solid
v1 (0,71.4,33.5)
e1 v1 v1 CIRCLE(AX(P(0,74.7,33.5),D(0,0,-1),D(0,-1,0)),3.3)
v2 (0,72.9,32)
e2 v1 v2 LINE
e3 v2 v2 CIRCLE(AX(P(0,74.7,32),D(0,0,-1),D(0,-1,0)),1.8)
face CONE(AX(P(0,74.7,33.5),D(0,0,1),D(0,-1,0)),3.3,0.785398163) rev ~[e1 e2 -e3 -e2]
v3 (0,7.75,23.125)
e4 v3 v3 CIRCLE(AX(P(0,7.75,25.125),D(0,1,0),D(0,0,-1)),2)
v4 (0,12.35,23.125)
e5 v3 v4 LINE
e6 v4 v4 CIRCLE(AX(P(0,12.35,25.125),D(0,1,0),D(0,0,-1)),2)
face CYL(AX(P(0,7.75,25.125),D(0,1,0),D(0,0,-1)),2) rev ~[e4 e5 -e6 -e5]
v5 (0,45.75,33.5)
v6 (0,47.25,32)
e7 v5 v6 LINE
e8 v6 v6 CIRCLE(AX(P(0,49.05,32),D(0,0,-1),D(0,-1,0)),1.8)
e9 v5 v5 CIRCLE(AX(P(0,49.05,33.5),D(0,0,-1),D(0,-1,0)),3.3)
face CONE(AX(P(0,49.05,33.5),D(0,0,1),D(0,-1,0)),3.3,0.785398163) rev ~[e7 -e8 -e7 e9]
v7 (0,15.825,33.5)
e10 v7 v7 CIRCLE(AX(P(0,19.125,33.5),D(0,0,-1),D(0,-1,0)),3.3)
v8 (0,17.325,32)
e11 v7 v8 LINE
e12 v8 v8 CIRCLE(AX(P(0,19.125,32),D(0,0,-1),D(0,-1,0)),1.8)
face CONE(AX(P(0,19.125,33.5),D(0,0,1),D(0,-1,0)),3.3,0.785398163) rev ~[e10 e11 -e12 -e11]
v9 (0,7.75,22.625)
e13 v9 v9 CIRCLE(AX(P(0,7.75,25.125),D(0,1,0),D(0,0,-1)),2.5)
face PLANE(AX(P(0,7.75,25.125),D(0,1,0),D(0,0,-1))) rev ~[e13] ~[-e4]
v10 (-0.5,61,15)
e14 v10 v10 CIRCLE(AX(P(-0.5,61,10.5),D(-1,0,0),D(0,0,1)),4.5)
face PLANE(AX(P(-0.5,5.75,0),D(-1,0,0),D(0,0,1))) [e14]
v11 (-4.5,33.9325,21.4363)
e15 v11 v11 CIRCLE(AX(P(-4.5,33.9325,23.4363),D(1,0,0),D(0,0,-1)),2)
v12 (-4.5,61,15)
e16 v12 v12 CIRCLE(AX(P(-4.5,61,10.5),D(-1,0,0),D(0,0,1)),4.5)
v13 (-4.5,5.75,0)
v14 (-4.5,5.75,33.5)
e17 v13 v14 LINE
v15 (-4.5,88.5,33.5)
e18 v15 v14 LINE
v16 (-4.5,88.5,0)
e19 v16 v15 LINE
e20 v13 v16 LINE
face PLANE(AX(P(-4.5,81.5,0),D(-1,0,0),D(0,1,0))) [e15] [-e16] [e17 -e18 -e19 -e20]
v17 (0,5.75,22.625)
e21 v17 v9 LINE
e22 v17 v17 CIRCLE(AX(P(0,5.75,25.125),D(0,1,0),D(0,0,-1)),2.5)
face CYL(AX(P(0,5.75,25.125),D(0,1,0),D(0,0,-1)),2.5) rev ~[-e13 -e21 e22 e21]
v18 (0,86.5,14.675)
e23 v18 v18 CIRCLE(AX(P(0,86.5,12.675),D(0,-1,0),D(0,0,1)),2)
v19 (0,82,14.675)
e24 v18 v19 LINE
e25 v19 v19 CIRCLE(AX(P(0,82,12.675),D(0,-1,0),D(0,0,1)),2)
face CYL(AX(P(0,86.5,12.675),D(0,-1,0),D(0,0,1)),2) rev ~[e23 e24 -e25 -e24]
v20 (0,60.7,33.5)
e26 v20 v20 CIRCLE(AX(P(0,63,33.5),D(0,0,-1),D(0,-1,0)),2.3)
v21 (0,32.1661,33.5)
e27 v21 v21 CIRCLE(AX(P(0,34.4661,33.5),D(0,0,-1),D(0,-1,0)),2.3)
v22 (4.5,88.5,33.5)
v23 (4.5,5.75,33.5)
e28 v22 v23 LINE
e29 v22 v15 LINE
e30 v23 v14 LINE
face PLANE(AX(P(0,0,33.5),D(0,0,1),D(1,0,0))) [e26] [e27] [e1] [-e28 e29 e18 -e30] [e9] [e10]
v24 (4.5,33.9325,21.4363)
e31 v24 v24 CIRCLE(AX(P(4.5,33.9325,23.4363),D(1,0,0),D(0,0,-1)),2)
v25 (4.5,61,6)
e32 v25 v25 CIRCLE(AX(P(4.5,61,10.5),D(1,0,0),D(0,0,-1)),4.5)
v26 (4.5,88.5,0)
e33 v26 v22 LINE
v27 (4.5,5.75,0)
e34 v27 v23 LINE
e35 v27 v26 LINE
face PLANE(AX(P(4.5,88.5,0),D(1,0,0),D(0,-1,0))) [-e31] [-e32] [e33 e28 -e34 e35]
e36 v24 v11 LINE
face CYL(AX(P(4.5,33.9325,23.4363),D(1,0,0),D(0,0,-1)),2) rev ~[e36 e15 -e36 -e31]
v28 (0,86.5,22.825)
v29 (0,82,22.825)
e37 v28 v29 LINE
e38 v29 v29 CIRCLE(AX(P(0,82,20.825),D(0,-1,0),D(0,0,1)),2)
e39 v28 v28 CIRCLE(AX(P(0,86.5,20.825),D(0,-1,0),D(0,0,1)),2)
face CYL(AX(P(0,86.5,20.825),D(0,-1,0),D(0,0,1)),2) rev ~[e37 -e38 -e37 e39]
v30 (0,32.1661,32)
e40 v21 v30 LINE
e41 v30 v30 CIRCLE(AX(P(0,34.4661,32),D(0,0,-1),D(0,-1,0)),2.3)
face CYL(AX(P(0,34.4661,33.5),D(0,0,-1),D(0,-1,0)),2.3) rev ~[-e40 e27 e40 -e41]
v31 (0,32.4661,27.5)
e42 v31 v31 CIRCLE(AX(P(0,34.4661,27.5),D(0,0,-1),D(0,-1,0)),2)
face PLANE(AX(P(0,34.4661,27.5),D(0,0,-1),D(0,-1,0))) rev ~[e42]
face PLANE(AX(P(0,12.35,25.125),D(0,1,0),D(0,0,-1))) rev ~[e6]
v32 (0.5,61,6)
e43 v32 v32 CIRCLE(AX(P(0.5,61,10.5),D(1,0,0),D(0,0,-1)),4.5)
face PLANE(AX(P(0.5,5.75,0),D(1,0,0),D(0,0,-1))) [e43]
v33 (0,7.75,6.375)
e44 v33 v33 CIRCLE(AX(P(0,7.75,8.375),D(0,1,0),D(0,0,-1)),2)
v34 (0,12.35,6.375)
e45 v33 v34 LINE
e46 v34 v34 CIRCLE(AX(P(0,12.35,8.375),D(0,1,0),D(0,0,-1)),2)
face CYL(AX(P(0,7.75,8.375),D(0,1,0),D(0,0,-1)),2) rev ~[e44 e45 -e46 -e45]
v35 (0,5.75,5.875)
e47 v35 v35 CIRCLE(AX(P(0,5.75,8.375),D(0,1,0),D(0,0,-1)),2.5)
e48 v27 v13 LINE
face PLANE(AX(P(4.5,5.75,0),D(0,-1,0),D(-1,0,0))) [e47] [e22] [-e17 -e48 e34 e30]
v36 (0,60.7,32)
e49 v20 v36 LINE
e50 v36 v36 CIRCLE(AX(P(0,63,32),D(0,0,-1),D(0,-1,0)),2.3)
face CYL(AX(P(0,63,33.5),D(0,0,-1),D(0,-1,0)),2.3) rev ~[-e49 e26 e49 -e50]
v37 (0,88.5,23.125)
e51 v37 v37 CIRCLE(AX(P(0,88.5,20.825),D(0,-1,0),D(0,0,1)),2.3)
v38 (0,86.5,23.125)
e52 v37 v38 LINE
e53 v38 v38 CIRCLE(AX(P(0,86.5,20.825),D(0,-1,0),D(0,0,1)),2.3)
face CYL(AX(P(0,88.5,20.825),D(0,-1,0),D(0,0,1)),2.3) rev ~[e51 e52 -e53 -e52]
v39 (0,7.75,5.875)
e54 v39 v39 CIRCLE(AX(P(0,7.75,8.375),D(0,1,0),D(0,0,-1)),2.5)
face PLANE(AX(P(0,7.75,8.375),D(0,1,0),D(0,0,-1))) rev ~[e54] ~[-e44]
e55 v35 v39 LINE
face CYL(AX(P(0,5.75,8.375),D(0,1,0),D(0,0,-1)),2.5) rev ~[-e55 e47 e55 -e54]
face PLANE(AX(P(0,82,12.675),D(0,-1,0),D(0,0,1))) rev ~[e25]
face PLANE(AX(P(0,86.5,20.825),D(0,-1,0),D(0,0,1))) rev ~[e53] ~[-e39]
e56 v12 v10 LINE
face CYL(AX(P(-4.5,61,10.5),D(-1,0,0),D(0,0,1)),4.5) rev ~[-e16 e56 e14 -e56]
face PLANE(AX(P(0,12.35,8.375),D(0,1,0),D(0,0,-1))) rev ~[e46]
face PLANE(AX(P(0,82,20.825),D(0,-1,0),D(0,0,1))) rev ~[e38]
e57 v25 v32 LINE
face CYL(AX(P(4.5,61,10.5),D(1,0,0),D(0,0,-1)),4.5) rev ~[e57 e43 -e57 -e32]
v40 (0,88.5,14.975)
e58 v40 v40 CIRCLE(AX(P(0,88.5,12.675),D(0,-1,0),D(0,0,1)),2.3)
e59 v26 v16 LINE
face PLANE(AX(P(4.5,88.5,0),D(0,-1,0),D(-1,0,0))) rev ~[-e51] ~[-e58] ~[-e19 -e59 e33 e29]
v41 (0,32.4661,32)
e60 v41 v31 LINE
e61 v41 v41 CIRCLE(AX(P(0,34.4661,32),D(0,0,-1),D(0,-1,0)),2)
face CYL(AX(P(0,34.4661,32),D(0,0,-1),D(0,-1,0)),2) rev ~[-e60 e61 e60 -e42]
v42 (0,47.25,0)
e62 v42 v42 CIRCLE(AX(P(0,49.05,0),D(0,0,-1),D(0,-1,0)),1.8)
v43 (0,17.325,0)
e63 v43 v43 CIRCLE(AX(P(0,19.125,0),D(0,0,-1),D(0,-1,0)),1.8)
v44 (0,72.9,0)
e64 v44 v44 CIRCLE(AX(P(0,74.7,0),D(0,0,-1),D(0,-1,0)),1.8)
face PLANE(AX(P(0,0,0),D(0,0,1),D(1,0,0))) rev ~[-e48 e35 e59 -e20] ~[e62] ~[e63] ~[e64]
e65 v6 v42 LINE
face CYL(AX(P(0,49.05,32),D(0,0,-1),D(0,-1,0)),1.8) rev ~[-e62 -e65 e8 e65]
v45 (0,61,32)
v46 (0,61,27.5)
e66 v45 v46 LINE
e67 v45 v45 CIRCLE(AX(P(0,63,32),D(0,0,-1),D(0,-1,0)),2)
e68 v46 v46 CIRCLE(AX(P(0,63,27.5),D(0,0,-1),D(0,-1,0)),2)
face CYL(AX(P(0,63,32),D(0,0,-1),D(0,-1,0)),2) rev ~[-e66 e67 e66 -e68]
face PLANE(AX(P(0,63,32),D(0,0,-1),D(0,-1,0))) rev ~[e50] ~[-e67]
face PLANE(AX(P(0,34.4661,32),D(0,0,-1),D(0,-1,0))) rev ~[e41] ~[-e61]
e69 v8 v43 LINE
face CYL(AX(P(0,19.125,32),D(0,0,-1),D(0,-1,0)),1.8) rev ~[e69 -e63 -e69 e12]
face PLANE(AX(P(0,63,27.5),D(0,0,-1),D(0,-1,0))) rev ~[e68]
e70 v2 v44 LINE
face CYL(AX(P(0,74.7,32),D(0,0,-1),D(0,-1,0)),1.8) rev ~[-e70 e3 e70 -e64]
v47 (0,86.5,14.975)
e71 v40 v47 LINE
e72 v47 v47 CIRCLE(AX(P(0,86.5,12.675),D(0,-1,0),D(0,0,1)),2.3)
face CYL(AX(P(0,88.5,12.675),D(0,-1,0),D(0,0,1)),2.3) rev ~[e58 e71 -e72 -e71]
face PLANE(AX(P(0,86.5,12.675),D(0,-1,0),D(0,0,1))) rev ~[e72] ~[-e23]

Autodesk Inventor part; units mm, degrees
ref_plane "YZ Plane" through (0, 0, 0) normal (1, 0, 0) x (0, 1, 0)
ref_plane "XZ Plane" through (0, 0, 0) normal (0, 1, 0) x (-1, 0, 0)
ref_plane "Work Plane1" through (0, 0, 0) normal (0, 0, 1) x (1, 0, 0)
ref_plane "Work Plane2" through (-89, -40.3889, 33.5) normal (0, 0, 1) x (1, 0, 0)
sketch "Sketch1" plane through (0, 0, 0) normal (0, 0, 1) x (1, 0, 0)
  line L0 (23.5, 88.5) -> (-23.5, 88.5) projected
  line L1 (-23.5, 88.5) -> (-23.5, 36.5) projected
  line L2 (-26.5, 33.5) -> (-89, 33.5) projected
  line L3 (-89, 33.5) -> (-89, -72.5) projected
  line L4 (-89, -72.5) -> (-77, -72.5) projected
  line L5 (-74, -75.5) -> (-74, -93.5) projected
  line L6 (-74, -93.5) -> (74, -93.5) projected
  line L7 (74, -93.5) -> (74, -75.5) projected
  line L8 (77, -72.5) -> (89, -72.5) projected
  line L9 (89, -72.5) -> (89, 33.5) projected
  line L10 (89, 33.5) -> (26.5, 33.5) projected
  line L11 (23.5, 36.5) -> (23.5, 88.5) projected
  line L12 (-4.5, 81.5) -> (-4.5, 36.5) projected
  line L13 (-7.5, 33.5) -> (-13.5, 33.5) projected
  line L14 (-16.5, 36.5) -> (-16.5, 81.5) projected
  line L15 (7.5, 84.5) -> (13.5, 84.5) projected
  line L16 (16.5, 81.5) -> (16.5, 36.5) projected
  line L17 (13.5, 33.5) -> (7.5, 33.5) projected
  line L18 (4.5, 36.5) -> (4.5, 81.5) projected
  line L19 (-13.5, 84.5) -> (-7.5, 84.5) projected
  line L20 (-4.5, 88.5) -> (4.5, 88.5)
  line L21 (4.5, 88.5) -> (4.5, 5.75)
  line L22 (4.5, 5.75) -> (-4.5, 5.75)
  line L23 (-4.5, 5.75) -> (-4.5, 88.5)
  line L24 (-32.2, 4.75) -> (-59.9, 4.75)
  arc A0 (13.5, 33.5) -> (16.5, 36.5) centre (13.5, 36.5) ccw projected
  arc A1 (4.5, 36.5) -> (7.5, 33.5) centre (7.5, 36.5) ccw projected
  arc A2 (7.5, 84.5) -> (4.5, 81.5) centre (7.5, 81.5) ccw projected
  arc A3 (16.5, 81.5) -> (13.5, 84.5) centre (13.5, 81.5) ccw projected
  arc A4 (-4.5, 81.5) -> (-7.5, 84.5) centre (-7.5, 81.5) ccw projected
  arc A5 (-7.5, 33.5) -> (-4.5, 36.5) centre (-7.5, 36.5) ccw projected
  arc A6 (-16.5, 36.5) -> (-13.5, 33.5) centre (-13.5, 36.5) ccw projected
  arc A7 (-13.5, 84.5) -> (-16.5, 81.5) centre (-13.5, 81.5) ccw projected
  arc A8 (-26.5, 33.5) -> (-23.5, 36.5) centre (-26.5, 36.5) ccw projected
  arc A9 (-74, -75.5) -> (-77, -72.5) centre (-77, -75.5) ccw projected
  arc A10 (77, -72.5) -> (74, -75.5) centre (77, -75.5) ccw projected
  arc A11 (23.5, 36.5) -> (26.5, 33.5) centre (26.5, 36.5) ccw projected
  circle A12 centre (21.5, -85.5) radius 1.8 projected
  circle A13 centre (-64.5, -85.5) radius 1.8 projected
  circle A14 centre (83.4, -16.3889) radius 1.8 projected
  circle A15 centre (-83.4, -19.2889) radius 1.8 projected
  circle A16 centre (-21.5, -85.5) radius 1.8 projected
  circle A17 centre (64.5, -85.5) radius 1.8 projected
  circle A18 centre (-56.0375, 15.0937) radius 1.0065 projected
  circle A19 centre (39.125, 4.3375) radius 1.0065 projected
  circle A20 centre (-72.95, 4.275) radius 1.0065 projected
  circle A21 centre (39.125, 25.9125) radius 1.0065 projected
  circle A22 centre (72.95, 12.275) radius 1.0065 projected
  circle A23 centre (86, 30.5) radius 1.0065 projected
  circle A24 centre (-86, 30.5) radius 1.0065 projected
  circle A25 centre (-39.125, 12.3375) radius 1.0065 projected
  circle A26 centre (-72.95, 25.975) radius 1.0065 projected
  circle A27 centre (-72.95, 12.275) radius 1.0065 projected
  circle A28 centre (-39.125, 25.9125) radius 1.0065 projected
  circle A29 centre (-86, 7.75) radius 1.0065 projected
  circle A30 centre (86, 7.75) radius 1.0065 projected
  circle A31 centre (72.95, 25.975) radius 1.0065 projected
  circle A32 centre (39.125, 12.3375) radius 1.0065 projected
  circle A33 centre (-39.125, 4.3375) radius 1.0065 projected
  circle A34 centre (72.95, 4.275) radius 1.0065 projected
  circle A35 centre (56.0375, 15.125) radius 1.0065 projected
  circle A36 centre (78, -67.1725) radius 1.2295 projected
  circle A37 centre (-24.1, -73.1) radius 1.2295 projected
  circle A38 centre (24.1, -24.9) radius 1.2295 projected
  circle A39 centre (-42.5, -43.2802) radius 1.2295 projected
  circle A40 centre (-79, -42.3889) radius 1.2295 projected
  circle A41 centre (-19.5, 28.875) radius 1.2295 projected
  circle A42 centre (19.5, 9.55) radius 1.2295 projected
  circle A43 centre (19.5, 47.3) radius 1.2295 projected
  circle A44 centre (-19.5, 47.3) radius 1.2295 projected
  circle A45 centre (0, 74.7) radius 1.2295 projected
  circle A46 centre (-19.4231, 74.8077) radius 1.2295 projected
  circle A47 centre (19.5, 74.7) radius 1.2295 projected
  circle A48 centre (0, 49.05) radius 1.2295 projected
  circle A49 centre (19.5, 28.875) radius 1.2295 projected
  circle A50 centre (0, 19.125) radius 1.2295 projected
  circle A51 centre (-19.5, 9.55) radius 1.2295 projected
  circle A52 centre (-78, -67.1725) radius 1.2295 projected
  circle A53 centre (-24.1, -24.9) radius 1.2295 projected
  circle A54 centre (24.1, -73.1) radius 1.2295 projected
  circle A55 centre (42.5, -42.7745) radius 1.2295 projected
  circle A56 centre (79, -42.3889) radius 1.2295 projected
  point P0 (0, 0)
  point P1 (-4.5, 81.5)
  point P2 (-4.5, 36.5)
  point P3 (7.5, 81.5)
  point P4 (13.5, 81.5)
  point P5 (-7.5, 81.5)
  point P6 (-13.5, 81.5)
  dimension "d41" = 1
extrude "Extrusion1" add sketch "Sketch1" along normal up to surface (33.5 mm away) contours L21 L18 L22 L23 L12 L0 | A45 | A48 | A50
sketch "Sketch2" plane through (4.5, 5.75, 0) normal (1, 0, 0) x (0, 0, -1)
  circle A0 centre (-23.4363, 28.1825) radius 2 projected
  point P0 (0, -5.75)
extrude "Extrusion2" cut sketch "Sketch2" against normal blind 10
sketch "Sketch3" plane through (4.5, 5.75, 0) normal (1, 0, 0) x (0, 0, -1)
  circle A0 centre (-10.5, 55.25) radius 4.5 projected
  point P0 (0, -5.75)
extrude "Extrusion3" cut sketch "Sketch3" against normal blind 4
sketch "Sketch4" plane through (-4.5, 5.75, 0) normal (-1, 0, 0) x (0, 0, 1)
  circle A0 centre (10.5, 55.25) radius 4.5 projected
  point P0 (0, -5.75)
extrude "Extrusion4" cut sketch "Sketch4" against normal blind 4
sketch "Sketch5" plane through (-4.5, 5.75, 33.5) normal (0, 0, 1) x (1, 0, 0)
  line L0 (5, 59.75) -> (5, 50.75) projected
  line L1 (4, 50.75) -> (4, 59.75) projected
  line L2 (9, 26.1825) -> (0, 26.1825) projected
  line L3 (9, 30.1825) -> (0, 30.1825) projected
  line L4 (17, 78.15) -> (-8, 78.15)
  line L5 (-8, 35.85) -> (17, 35.85)
  line L6 (9, 82.75) -> (9, 0) projected
  line L7 (0, 50.75) -> (0, 59.75) projected
  line L8 (9, 35.85) -> (0, 35.85)
  line L9 (0, 35.85) -> (0, 50.75)
  line L10 (0, 50.75) -> (9, 50.75)
  line L11 (9, 50.75) -> (9, 35.85)
  line L12 (0, 0) -> (0, 82.75) projected
  line L13 (9, 78.15) -> (0, 78.15)
  line L14 (0, 78.15) -> (0, 59.75)
  line L15 (0, 59.75) -> (9, 59.75)
  line L16 (9, 59.75) -> (9, 78.15)
  line L17 (-18, 6.625) -> (-18, 20.125) projected
  line L18 (-18, 13.375) -> (27, 13.375)
  line L19 (9, 35.85) -> (0, 50.75)
  line L20 (9, 59.75) -> (9, 50.75) projected
  line L21 (0, 35.85) -> (9, 50.75)
  line L22 (9, 59.75) -> (0, 78.15)
  line L23 (0, 59.75) -> (9, 78.15)
  point P0 (4.5, -5.75)
  point P1 (4.5, 13.375)
  point P2 (4.5, 43.3)
  point P3 (4.5, 68.95)
  dimension "d9" = 4.5
  dimension "d10" = 4.5
hole "Hole1" at (0, 19.125, 33.5) at (0, 49.05, 33.5) at (0, 74.7, 33.5) direction (0, 0, -1) diameter 3.6 end through all countersink diameter 6.6 countersink angle 90 clearance for "Countersunk Flat Head Screw ISO 2009/7046" size "M3" standard "ISO"
sketch "Sketch6" plane through (-4.5, 5.75, 0) normal (0, -1, 0) x (1, 0, 0)
  line L0 (9, 33.5) -> (0, 33.5) projected
  line L1 (0, 0) -> (0, 33.5) projected
  line L2 (0, 0) -> (9, 0) projected
  line L3 (9, 0) -> (9, 33.5) projected
  line L4 (0, 16.75) -> (9, 16.75)
  line L5 (9, 16.75) -> (0, 33.5)
  line L6 (9, 33.5) -> (0, 16.75)
  line L7 (0, 16.75) -> (9, 0)
  line L8 (9, 16.75) -> (0, 0)
  point P0 (4.5, 0)
  point P1 (4.5, 8.375)
  point P2 (4.5, 25.125)
hole "Hole2" at (0, 5.75, 8.375) at (0, 5.75, 25.125) direction (0, 1, 0) diameter 4 depth 6.6 counterbore diameter 5 counterbore depth 2
sketch "Sketch7" plane through (-4.5, 88.5, 0) normal (0, 1, 0) x (1, 0, 0)
  line L0 (0, -33.5) -> (9, -33.5) projected
  line L1 (0, -33.5) -> (9, -33.5) projected
  line L2 (9, 0) -> (9, -33.5) projected
  line L3 (9, 0) -> (0, 0) projected
  line L4 (0, 0) -> (0, -33.5) projected
  line L5 (-8, -1.4) -> (-8, -6.6) projected
  line L6 (-8, -32.1) -> (-8, -26.9) projected
  line L7 (17, -32.1) -> (17, -26.9) projected
  line L8 (17, -1.4) -> (17, -6.6) projected
  line L9 (17, -32.1) -> (-8, -32.1)
  line L10 (-8, -32.1) -> (-8, -26.9)
  line L11 (-8, -26.9) -> (17, -26.9)
  line L12 (17, -26.9) -> (17, -32.1)
  line L13 (-8, -6.6) -> (17, -6.6)
  line L14 (17, -6.6) -> (17, -1.4)
  line L15 (17, -1.4) -> (-8, -1.4)
  line L16 (-8, -1.4) -> (-8, -6.6)
  line L17 (17, -6.6) -> (-8, -6.6)
  line L18 (-8, -6.6) -> (-8, -8.6)
  line L19 (-8, -8.6) -> (17, -8.6)
  line L20 (17, -8.6) -> (17, -6.6)
  line L21 (-8, -26.9) -> (17, -26.9)
  line L22 (17, -26.9) -> (17, -24.9)
  line L23 (17, -24.9) -> (-8, -24.9)
  line L24 (-8, -24.9) -> (-8, -26.9)
  line L25 (9, 0) -> (9, -33.5) projected
  line L26 (9, -16.75) -> (0, -16.75)
  line L27 (0, 0) -> (0, -33.5) projected
  line L28 (9, -24.9) -> (0, -16.75)
  line L29 (9, -8.6) -> (0, -16.75)
  line L30 (0, -8.6) -> (9, -16.75)
  line L31 (9, -16.75) -> (0, -24.9)
  point P0 (4.5, 0)
  point P1 (4.5, -20.825)
  point P2 (4.5, -12.675)
  dimension "d25" = 2
  dimension "d26" = 2
hole "Hole3" at (0, 88.5, 20.825) at (0, 88.5, 12.675) direction (0, -1, 0) diameter 4 depth 6.5 counterbore diameter 4.6 counterbore depth 2
sketch "Sketch8" plane through (-4.5, 5.75, 33.5) normal (0, 0, 1) x (1, 0, 0)
  line L0 (26, 27.2497) -> (-17, 27.2497)
  line L1 (26, 31.2497) -> (-17, 31.2497)
  line L2 (4, 52.75) -> (-1, 52.75)
  line L3 (4, 61.75) -> (-1, 61.75)
  line L4 (10, 61.75) -> (5, 61.75)
  line L5 (9, 50.75) -> (5, 50.75) projected
  line L6 (0, 0) -> (0, 82.75) projected
  line L7 (9, 52.75) -> (0, 52.75)
  line L8 (0, 52.75) -> (0, 61.75)
  line L9 (0, 61.75) -> (9, 61.75)
  line L10 (9, 61.75) -> (9, 50.75)
  line L11 (9, 26.1825) -> (0, 26.1825) projected
  line L12 (0, 31.2497) -> (9, 31.2497)
  line L13 (9, 31.2497) -> (9, 26.1825)
  line L14 (9, 26.1825) -> (0, 26.1825)
  line L15 (0, 26.1825) -> (0, 31.2497)
  line L16 (9, 26.1825) -> (0, 31.2497)
  line L17 (0, 26.1825) -> (9, 31.2497)
  line L18 (10, 51.75) -> (0, 61.75)
  line L19 (0, 52.75) -> (9, 61.75)
  point P0 (4.5, -5.75)
  point P1 (4.5, 28.7161)
  point P2 (4.5, 57.25)
hole "Hole4" at (0, 34.4661, 33.5) at (0, 63, 33.5) direction (0, 0, -1) diameter 4 depth 6 counterbore diameter 4.6 counterbore depth 1.5
equation "\"d9\" = d10"
properties part number "middle_gear_holder" material "Nylon 6/6"
